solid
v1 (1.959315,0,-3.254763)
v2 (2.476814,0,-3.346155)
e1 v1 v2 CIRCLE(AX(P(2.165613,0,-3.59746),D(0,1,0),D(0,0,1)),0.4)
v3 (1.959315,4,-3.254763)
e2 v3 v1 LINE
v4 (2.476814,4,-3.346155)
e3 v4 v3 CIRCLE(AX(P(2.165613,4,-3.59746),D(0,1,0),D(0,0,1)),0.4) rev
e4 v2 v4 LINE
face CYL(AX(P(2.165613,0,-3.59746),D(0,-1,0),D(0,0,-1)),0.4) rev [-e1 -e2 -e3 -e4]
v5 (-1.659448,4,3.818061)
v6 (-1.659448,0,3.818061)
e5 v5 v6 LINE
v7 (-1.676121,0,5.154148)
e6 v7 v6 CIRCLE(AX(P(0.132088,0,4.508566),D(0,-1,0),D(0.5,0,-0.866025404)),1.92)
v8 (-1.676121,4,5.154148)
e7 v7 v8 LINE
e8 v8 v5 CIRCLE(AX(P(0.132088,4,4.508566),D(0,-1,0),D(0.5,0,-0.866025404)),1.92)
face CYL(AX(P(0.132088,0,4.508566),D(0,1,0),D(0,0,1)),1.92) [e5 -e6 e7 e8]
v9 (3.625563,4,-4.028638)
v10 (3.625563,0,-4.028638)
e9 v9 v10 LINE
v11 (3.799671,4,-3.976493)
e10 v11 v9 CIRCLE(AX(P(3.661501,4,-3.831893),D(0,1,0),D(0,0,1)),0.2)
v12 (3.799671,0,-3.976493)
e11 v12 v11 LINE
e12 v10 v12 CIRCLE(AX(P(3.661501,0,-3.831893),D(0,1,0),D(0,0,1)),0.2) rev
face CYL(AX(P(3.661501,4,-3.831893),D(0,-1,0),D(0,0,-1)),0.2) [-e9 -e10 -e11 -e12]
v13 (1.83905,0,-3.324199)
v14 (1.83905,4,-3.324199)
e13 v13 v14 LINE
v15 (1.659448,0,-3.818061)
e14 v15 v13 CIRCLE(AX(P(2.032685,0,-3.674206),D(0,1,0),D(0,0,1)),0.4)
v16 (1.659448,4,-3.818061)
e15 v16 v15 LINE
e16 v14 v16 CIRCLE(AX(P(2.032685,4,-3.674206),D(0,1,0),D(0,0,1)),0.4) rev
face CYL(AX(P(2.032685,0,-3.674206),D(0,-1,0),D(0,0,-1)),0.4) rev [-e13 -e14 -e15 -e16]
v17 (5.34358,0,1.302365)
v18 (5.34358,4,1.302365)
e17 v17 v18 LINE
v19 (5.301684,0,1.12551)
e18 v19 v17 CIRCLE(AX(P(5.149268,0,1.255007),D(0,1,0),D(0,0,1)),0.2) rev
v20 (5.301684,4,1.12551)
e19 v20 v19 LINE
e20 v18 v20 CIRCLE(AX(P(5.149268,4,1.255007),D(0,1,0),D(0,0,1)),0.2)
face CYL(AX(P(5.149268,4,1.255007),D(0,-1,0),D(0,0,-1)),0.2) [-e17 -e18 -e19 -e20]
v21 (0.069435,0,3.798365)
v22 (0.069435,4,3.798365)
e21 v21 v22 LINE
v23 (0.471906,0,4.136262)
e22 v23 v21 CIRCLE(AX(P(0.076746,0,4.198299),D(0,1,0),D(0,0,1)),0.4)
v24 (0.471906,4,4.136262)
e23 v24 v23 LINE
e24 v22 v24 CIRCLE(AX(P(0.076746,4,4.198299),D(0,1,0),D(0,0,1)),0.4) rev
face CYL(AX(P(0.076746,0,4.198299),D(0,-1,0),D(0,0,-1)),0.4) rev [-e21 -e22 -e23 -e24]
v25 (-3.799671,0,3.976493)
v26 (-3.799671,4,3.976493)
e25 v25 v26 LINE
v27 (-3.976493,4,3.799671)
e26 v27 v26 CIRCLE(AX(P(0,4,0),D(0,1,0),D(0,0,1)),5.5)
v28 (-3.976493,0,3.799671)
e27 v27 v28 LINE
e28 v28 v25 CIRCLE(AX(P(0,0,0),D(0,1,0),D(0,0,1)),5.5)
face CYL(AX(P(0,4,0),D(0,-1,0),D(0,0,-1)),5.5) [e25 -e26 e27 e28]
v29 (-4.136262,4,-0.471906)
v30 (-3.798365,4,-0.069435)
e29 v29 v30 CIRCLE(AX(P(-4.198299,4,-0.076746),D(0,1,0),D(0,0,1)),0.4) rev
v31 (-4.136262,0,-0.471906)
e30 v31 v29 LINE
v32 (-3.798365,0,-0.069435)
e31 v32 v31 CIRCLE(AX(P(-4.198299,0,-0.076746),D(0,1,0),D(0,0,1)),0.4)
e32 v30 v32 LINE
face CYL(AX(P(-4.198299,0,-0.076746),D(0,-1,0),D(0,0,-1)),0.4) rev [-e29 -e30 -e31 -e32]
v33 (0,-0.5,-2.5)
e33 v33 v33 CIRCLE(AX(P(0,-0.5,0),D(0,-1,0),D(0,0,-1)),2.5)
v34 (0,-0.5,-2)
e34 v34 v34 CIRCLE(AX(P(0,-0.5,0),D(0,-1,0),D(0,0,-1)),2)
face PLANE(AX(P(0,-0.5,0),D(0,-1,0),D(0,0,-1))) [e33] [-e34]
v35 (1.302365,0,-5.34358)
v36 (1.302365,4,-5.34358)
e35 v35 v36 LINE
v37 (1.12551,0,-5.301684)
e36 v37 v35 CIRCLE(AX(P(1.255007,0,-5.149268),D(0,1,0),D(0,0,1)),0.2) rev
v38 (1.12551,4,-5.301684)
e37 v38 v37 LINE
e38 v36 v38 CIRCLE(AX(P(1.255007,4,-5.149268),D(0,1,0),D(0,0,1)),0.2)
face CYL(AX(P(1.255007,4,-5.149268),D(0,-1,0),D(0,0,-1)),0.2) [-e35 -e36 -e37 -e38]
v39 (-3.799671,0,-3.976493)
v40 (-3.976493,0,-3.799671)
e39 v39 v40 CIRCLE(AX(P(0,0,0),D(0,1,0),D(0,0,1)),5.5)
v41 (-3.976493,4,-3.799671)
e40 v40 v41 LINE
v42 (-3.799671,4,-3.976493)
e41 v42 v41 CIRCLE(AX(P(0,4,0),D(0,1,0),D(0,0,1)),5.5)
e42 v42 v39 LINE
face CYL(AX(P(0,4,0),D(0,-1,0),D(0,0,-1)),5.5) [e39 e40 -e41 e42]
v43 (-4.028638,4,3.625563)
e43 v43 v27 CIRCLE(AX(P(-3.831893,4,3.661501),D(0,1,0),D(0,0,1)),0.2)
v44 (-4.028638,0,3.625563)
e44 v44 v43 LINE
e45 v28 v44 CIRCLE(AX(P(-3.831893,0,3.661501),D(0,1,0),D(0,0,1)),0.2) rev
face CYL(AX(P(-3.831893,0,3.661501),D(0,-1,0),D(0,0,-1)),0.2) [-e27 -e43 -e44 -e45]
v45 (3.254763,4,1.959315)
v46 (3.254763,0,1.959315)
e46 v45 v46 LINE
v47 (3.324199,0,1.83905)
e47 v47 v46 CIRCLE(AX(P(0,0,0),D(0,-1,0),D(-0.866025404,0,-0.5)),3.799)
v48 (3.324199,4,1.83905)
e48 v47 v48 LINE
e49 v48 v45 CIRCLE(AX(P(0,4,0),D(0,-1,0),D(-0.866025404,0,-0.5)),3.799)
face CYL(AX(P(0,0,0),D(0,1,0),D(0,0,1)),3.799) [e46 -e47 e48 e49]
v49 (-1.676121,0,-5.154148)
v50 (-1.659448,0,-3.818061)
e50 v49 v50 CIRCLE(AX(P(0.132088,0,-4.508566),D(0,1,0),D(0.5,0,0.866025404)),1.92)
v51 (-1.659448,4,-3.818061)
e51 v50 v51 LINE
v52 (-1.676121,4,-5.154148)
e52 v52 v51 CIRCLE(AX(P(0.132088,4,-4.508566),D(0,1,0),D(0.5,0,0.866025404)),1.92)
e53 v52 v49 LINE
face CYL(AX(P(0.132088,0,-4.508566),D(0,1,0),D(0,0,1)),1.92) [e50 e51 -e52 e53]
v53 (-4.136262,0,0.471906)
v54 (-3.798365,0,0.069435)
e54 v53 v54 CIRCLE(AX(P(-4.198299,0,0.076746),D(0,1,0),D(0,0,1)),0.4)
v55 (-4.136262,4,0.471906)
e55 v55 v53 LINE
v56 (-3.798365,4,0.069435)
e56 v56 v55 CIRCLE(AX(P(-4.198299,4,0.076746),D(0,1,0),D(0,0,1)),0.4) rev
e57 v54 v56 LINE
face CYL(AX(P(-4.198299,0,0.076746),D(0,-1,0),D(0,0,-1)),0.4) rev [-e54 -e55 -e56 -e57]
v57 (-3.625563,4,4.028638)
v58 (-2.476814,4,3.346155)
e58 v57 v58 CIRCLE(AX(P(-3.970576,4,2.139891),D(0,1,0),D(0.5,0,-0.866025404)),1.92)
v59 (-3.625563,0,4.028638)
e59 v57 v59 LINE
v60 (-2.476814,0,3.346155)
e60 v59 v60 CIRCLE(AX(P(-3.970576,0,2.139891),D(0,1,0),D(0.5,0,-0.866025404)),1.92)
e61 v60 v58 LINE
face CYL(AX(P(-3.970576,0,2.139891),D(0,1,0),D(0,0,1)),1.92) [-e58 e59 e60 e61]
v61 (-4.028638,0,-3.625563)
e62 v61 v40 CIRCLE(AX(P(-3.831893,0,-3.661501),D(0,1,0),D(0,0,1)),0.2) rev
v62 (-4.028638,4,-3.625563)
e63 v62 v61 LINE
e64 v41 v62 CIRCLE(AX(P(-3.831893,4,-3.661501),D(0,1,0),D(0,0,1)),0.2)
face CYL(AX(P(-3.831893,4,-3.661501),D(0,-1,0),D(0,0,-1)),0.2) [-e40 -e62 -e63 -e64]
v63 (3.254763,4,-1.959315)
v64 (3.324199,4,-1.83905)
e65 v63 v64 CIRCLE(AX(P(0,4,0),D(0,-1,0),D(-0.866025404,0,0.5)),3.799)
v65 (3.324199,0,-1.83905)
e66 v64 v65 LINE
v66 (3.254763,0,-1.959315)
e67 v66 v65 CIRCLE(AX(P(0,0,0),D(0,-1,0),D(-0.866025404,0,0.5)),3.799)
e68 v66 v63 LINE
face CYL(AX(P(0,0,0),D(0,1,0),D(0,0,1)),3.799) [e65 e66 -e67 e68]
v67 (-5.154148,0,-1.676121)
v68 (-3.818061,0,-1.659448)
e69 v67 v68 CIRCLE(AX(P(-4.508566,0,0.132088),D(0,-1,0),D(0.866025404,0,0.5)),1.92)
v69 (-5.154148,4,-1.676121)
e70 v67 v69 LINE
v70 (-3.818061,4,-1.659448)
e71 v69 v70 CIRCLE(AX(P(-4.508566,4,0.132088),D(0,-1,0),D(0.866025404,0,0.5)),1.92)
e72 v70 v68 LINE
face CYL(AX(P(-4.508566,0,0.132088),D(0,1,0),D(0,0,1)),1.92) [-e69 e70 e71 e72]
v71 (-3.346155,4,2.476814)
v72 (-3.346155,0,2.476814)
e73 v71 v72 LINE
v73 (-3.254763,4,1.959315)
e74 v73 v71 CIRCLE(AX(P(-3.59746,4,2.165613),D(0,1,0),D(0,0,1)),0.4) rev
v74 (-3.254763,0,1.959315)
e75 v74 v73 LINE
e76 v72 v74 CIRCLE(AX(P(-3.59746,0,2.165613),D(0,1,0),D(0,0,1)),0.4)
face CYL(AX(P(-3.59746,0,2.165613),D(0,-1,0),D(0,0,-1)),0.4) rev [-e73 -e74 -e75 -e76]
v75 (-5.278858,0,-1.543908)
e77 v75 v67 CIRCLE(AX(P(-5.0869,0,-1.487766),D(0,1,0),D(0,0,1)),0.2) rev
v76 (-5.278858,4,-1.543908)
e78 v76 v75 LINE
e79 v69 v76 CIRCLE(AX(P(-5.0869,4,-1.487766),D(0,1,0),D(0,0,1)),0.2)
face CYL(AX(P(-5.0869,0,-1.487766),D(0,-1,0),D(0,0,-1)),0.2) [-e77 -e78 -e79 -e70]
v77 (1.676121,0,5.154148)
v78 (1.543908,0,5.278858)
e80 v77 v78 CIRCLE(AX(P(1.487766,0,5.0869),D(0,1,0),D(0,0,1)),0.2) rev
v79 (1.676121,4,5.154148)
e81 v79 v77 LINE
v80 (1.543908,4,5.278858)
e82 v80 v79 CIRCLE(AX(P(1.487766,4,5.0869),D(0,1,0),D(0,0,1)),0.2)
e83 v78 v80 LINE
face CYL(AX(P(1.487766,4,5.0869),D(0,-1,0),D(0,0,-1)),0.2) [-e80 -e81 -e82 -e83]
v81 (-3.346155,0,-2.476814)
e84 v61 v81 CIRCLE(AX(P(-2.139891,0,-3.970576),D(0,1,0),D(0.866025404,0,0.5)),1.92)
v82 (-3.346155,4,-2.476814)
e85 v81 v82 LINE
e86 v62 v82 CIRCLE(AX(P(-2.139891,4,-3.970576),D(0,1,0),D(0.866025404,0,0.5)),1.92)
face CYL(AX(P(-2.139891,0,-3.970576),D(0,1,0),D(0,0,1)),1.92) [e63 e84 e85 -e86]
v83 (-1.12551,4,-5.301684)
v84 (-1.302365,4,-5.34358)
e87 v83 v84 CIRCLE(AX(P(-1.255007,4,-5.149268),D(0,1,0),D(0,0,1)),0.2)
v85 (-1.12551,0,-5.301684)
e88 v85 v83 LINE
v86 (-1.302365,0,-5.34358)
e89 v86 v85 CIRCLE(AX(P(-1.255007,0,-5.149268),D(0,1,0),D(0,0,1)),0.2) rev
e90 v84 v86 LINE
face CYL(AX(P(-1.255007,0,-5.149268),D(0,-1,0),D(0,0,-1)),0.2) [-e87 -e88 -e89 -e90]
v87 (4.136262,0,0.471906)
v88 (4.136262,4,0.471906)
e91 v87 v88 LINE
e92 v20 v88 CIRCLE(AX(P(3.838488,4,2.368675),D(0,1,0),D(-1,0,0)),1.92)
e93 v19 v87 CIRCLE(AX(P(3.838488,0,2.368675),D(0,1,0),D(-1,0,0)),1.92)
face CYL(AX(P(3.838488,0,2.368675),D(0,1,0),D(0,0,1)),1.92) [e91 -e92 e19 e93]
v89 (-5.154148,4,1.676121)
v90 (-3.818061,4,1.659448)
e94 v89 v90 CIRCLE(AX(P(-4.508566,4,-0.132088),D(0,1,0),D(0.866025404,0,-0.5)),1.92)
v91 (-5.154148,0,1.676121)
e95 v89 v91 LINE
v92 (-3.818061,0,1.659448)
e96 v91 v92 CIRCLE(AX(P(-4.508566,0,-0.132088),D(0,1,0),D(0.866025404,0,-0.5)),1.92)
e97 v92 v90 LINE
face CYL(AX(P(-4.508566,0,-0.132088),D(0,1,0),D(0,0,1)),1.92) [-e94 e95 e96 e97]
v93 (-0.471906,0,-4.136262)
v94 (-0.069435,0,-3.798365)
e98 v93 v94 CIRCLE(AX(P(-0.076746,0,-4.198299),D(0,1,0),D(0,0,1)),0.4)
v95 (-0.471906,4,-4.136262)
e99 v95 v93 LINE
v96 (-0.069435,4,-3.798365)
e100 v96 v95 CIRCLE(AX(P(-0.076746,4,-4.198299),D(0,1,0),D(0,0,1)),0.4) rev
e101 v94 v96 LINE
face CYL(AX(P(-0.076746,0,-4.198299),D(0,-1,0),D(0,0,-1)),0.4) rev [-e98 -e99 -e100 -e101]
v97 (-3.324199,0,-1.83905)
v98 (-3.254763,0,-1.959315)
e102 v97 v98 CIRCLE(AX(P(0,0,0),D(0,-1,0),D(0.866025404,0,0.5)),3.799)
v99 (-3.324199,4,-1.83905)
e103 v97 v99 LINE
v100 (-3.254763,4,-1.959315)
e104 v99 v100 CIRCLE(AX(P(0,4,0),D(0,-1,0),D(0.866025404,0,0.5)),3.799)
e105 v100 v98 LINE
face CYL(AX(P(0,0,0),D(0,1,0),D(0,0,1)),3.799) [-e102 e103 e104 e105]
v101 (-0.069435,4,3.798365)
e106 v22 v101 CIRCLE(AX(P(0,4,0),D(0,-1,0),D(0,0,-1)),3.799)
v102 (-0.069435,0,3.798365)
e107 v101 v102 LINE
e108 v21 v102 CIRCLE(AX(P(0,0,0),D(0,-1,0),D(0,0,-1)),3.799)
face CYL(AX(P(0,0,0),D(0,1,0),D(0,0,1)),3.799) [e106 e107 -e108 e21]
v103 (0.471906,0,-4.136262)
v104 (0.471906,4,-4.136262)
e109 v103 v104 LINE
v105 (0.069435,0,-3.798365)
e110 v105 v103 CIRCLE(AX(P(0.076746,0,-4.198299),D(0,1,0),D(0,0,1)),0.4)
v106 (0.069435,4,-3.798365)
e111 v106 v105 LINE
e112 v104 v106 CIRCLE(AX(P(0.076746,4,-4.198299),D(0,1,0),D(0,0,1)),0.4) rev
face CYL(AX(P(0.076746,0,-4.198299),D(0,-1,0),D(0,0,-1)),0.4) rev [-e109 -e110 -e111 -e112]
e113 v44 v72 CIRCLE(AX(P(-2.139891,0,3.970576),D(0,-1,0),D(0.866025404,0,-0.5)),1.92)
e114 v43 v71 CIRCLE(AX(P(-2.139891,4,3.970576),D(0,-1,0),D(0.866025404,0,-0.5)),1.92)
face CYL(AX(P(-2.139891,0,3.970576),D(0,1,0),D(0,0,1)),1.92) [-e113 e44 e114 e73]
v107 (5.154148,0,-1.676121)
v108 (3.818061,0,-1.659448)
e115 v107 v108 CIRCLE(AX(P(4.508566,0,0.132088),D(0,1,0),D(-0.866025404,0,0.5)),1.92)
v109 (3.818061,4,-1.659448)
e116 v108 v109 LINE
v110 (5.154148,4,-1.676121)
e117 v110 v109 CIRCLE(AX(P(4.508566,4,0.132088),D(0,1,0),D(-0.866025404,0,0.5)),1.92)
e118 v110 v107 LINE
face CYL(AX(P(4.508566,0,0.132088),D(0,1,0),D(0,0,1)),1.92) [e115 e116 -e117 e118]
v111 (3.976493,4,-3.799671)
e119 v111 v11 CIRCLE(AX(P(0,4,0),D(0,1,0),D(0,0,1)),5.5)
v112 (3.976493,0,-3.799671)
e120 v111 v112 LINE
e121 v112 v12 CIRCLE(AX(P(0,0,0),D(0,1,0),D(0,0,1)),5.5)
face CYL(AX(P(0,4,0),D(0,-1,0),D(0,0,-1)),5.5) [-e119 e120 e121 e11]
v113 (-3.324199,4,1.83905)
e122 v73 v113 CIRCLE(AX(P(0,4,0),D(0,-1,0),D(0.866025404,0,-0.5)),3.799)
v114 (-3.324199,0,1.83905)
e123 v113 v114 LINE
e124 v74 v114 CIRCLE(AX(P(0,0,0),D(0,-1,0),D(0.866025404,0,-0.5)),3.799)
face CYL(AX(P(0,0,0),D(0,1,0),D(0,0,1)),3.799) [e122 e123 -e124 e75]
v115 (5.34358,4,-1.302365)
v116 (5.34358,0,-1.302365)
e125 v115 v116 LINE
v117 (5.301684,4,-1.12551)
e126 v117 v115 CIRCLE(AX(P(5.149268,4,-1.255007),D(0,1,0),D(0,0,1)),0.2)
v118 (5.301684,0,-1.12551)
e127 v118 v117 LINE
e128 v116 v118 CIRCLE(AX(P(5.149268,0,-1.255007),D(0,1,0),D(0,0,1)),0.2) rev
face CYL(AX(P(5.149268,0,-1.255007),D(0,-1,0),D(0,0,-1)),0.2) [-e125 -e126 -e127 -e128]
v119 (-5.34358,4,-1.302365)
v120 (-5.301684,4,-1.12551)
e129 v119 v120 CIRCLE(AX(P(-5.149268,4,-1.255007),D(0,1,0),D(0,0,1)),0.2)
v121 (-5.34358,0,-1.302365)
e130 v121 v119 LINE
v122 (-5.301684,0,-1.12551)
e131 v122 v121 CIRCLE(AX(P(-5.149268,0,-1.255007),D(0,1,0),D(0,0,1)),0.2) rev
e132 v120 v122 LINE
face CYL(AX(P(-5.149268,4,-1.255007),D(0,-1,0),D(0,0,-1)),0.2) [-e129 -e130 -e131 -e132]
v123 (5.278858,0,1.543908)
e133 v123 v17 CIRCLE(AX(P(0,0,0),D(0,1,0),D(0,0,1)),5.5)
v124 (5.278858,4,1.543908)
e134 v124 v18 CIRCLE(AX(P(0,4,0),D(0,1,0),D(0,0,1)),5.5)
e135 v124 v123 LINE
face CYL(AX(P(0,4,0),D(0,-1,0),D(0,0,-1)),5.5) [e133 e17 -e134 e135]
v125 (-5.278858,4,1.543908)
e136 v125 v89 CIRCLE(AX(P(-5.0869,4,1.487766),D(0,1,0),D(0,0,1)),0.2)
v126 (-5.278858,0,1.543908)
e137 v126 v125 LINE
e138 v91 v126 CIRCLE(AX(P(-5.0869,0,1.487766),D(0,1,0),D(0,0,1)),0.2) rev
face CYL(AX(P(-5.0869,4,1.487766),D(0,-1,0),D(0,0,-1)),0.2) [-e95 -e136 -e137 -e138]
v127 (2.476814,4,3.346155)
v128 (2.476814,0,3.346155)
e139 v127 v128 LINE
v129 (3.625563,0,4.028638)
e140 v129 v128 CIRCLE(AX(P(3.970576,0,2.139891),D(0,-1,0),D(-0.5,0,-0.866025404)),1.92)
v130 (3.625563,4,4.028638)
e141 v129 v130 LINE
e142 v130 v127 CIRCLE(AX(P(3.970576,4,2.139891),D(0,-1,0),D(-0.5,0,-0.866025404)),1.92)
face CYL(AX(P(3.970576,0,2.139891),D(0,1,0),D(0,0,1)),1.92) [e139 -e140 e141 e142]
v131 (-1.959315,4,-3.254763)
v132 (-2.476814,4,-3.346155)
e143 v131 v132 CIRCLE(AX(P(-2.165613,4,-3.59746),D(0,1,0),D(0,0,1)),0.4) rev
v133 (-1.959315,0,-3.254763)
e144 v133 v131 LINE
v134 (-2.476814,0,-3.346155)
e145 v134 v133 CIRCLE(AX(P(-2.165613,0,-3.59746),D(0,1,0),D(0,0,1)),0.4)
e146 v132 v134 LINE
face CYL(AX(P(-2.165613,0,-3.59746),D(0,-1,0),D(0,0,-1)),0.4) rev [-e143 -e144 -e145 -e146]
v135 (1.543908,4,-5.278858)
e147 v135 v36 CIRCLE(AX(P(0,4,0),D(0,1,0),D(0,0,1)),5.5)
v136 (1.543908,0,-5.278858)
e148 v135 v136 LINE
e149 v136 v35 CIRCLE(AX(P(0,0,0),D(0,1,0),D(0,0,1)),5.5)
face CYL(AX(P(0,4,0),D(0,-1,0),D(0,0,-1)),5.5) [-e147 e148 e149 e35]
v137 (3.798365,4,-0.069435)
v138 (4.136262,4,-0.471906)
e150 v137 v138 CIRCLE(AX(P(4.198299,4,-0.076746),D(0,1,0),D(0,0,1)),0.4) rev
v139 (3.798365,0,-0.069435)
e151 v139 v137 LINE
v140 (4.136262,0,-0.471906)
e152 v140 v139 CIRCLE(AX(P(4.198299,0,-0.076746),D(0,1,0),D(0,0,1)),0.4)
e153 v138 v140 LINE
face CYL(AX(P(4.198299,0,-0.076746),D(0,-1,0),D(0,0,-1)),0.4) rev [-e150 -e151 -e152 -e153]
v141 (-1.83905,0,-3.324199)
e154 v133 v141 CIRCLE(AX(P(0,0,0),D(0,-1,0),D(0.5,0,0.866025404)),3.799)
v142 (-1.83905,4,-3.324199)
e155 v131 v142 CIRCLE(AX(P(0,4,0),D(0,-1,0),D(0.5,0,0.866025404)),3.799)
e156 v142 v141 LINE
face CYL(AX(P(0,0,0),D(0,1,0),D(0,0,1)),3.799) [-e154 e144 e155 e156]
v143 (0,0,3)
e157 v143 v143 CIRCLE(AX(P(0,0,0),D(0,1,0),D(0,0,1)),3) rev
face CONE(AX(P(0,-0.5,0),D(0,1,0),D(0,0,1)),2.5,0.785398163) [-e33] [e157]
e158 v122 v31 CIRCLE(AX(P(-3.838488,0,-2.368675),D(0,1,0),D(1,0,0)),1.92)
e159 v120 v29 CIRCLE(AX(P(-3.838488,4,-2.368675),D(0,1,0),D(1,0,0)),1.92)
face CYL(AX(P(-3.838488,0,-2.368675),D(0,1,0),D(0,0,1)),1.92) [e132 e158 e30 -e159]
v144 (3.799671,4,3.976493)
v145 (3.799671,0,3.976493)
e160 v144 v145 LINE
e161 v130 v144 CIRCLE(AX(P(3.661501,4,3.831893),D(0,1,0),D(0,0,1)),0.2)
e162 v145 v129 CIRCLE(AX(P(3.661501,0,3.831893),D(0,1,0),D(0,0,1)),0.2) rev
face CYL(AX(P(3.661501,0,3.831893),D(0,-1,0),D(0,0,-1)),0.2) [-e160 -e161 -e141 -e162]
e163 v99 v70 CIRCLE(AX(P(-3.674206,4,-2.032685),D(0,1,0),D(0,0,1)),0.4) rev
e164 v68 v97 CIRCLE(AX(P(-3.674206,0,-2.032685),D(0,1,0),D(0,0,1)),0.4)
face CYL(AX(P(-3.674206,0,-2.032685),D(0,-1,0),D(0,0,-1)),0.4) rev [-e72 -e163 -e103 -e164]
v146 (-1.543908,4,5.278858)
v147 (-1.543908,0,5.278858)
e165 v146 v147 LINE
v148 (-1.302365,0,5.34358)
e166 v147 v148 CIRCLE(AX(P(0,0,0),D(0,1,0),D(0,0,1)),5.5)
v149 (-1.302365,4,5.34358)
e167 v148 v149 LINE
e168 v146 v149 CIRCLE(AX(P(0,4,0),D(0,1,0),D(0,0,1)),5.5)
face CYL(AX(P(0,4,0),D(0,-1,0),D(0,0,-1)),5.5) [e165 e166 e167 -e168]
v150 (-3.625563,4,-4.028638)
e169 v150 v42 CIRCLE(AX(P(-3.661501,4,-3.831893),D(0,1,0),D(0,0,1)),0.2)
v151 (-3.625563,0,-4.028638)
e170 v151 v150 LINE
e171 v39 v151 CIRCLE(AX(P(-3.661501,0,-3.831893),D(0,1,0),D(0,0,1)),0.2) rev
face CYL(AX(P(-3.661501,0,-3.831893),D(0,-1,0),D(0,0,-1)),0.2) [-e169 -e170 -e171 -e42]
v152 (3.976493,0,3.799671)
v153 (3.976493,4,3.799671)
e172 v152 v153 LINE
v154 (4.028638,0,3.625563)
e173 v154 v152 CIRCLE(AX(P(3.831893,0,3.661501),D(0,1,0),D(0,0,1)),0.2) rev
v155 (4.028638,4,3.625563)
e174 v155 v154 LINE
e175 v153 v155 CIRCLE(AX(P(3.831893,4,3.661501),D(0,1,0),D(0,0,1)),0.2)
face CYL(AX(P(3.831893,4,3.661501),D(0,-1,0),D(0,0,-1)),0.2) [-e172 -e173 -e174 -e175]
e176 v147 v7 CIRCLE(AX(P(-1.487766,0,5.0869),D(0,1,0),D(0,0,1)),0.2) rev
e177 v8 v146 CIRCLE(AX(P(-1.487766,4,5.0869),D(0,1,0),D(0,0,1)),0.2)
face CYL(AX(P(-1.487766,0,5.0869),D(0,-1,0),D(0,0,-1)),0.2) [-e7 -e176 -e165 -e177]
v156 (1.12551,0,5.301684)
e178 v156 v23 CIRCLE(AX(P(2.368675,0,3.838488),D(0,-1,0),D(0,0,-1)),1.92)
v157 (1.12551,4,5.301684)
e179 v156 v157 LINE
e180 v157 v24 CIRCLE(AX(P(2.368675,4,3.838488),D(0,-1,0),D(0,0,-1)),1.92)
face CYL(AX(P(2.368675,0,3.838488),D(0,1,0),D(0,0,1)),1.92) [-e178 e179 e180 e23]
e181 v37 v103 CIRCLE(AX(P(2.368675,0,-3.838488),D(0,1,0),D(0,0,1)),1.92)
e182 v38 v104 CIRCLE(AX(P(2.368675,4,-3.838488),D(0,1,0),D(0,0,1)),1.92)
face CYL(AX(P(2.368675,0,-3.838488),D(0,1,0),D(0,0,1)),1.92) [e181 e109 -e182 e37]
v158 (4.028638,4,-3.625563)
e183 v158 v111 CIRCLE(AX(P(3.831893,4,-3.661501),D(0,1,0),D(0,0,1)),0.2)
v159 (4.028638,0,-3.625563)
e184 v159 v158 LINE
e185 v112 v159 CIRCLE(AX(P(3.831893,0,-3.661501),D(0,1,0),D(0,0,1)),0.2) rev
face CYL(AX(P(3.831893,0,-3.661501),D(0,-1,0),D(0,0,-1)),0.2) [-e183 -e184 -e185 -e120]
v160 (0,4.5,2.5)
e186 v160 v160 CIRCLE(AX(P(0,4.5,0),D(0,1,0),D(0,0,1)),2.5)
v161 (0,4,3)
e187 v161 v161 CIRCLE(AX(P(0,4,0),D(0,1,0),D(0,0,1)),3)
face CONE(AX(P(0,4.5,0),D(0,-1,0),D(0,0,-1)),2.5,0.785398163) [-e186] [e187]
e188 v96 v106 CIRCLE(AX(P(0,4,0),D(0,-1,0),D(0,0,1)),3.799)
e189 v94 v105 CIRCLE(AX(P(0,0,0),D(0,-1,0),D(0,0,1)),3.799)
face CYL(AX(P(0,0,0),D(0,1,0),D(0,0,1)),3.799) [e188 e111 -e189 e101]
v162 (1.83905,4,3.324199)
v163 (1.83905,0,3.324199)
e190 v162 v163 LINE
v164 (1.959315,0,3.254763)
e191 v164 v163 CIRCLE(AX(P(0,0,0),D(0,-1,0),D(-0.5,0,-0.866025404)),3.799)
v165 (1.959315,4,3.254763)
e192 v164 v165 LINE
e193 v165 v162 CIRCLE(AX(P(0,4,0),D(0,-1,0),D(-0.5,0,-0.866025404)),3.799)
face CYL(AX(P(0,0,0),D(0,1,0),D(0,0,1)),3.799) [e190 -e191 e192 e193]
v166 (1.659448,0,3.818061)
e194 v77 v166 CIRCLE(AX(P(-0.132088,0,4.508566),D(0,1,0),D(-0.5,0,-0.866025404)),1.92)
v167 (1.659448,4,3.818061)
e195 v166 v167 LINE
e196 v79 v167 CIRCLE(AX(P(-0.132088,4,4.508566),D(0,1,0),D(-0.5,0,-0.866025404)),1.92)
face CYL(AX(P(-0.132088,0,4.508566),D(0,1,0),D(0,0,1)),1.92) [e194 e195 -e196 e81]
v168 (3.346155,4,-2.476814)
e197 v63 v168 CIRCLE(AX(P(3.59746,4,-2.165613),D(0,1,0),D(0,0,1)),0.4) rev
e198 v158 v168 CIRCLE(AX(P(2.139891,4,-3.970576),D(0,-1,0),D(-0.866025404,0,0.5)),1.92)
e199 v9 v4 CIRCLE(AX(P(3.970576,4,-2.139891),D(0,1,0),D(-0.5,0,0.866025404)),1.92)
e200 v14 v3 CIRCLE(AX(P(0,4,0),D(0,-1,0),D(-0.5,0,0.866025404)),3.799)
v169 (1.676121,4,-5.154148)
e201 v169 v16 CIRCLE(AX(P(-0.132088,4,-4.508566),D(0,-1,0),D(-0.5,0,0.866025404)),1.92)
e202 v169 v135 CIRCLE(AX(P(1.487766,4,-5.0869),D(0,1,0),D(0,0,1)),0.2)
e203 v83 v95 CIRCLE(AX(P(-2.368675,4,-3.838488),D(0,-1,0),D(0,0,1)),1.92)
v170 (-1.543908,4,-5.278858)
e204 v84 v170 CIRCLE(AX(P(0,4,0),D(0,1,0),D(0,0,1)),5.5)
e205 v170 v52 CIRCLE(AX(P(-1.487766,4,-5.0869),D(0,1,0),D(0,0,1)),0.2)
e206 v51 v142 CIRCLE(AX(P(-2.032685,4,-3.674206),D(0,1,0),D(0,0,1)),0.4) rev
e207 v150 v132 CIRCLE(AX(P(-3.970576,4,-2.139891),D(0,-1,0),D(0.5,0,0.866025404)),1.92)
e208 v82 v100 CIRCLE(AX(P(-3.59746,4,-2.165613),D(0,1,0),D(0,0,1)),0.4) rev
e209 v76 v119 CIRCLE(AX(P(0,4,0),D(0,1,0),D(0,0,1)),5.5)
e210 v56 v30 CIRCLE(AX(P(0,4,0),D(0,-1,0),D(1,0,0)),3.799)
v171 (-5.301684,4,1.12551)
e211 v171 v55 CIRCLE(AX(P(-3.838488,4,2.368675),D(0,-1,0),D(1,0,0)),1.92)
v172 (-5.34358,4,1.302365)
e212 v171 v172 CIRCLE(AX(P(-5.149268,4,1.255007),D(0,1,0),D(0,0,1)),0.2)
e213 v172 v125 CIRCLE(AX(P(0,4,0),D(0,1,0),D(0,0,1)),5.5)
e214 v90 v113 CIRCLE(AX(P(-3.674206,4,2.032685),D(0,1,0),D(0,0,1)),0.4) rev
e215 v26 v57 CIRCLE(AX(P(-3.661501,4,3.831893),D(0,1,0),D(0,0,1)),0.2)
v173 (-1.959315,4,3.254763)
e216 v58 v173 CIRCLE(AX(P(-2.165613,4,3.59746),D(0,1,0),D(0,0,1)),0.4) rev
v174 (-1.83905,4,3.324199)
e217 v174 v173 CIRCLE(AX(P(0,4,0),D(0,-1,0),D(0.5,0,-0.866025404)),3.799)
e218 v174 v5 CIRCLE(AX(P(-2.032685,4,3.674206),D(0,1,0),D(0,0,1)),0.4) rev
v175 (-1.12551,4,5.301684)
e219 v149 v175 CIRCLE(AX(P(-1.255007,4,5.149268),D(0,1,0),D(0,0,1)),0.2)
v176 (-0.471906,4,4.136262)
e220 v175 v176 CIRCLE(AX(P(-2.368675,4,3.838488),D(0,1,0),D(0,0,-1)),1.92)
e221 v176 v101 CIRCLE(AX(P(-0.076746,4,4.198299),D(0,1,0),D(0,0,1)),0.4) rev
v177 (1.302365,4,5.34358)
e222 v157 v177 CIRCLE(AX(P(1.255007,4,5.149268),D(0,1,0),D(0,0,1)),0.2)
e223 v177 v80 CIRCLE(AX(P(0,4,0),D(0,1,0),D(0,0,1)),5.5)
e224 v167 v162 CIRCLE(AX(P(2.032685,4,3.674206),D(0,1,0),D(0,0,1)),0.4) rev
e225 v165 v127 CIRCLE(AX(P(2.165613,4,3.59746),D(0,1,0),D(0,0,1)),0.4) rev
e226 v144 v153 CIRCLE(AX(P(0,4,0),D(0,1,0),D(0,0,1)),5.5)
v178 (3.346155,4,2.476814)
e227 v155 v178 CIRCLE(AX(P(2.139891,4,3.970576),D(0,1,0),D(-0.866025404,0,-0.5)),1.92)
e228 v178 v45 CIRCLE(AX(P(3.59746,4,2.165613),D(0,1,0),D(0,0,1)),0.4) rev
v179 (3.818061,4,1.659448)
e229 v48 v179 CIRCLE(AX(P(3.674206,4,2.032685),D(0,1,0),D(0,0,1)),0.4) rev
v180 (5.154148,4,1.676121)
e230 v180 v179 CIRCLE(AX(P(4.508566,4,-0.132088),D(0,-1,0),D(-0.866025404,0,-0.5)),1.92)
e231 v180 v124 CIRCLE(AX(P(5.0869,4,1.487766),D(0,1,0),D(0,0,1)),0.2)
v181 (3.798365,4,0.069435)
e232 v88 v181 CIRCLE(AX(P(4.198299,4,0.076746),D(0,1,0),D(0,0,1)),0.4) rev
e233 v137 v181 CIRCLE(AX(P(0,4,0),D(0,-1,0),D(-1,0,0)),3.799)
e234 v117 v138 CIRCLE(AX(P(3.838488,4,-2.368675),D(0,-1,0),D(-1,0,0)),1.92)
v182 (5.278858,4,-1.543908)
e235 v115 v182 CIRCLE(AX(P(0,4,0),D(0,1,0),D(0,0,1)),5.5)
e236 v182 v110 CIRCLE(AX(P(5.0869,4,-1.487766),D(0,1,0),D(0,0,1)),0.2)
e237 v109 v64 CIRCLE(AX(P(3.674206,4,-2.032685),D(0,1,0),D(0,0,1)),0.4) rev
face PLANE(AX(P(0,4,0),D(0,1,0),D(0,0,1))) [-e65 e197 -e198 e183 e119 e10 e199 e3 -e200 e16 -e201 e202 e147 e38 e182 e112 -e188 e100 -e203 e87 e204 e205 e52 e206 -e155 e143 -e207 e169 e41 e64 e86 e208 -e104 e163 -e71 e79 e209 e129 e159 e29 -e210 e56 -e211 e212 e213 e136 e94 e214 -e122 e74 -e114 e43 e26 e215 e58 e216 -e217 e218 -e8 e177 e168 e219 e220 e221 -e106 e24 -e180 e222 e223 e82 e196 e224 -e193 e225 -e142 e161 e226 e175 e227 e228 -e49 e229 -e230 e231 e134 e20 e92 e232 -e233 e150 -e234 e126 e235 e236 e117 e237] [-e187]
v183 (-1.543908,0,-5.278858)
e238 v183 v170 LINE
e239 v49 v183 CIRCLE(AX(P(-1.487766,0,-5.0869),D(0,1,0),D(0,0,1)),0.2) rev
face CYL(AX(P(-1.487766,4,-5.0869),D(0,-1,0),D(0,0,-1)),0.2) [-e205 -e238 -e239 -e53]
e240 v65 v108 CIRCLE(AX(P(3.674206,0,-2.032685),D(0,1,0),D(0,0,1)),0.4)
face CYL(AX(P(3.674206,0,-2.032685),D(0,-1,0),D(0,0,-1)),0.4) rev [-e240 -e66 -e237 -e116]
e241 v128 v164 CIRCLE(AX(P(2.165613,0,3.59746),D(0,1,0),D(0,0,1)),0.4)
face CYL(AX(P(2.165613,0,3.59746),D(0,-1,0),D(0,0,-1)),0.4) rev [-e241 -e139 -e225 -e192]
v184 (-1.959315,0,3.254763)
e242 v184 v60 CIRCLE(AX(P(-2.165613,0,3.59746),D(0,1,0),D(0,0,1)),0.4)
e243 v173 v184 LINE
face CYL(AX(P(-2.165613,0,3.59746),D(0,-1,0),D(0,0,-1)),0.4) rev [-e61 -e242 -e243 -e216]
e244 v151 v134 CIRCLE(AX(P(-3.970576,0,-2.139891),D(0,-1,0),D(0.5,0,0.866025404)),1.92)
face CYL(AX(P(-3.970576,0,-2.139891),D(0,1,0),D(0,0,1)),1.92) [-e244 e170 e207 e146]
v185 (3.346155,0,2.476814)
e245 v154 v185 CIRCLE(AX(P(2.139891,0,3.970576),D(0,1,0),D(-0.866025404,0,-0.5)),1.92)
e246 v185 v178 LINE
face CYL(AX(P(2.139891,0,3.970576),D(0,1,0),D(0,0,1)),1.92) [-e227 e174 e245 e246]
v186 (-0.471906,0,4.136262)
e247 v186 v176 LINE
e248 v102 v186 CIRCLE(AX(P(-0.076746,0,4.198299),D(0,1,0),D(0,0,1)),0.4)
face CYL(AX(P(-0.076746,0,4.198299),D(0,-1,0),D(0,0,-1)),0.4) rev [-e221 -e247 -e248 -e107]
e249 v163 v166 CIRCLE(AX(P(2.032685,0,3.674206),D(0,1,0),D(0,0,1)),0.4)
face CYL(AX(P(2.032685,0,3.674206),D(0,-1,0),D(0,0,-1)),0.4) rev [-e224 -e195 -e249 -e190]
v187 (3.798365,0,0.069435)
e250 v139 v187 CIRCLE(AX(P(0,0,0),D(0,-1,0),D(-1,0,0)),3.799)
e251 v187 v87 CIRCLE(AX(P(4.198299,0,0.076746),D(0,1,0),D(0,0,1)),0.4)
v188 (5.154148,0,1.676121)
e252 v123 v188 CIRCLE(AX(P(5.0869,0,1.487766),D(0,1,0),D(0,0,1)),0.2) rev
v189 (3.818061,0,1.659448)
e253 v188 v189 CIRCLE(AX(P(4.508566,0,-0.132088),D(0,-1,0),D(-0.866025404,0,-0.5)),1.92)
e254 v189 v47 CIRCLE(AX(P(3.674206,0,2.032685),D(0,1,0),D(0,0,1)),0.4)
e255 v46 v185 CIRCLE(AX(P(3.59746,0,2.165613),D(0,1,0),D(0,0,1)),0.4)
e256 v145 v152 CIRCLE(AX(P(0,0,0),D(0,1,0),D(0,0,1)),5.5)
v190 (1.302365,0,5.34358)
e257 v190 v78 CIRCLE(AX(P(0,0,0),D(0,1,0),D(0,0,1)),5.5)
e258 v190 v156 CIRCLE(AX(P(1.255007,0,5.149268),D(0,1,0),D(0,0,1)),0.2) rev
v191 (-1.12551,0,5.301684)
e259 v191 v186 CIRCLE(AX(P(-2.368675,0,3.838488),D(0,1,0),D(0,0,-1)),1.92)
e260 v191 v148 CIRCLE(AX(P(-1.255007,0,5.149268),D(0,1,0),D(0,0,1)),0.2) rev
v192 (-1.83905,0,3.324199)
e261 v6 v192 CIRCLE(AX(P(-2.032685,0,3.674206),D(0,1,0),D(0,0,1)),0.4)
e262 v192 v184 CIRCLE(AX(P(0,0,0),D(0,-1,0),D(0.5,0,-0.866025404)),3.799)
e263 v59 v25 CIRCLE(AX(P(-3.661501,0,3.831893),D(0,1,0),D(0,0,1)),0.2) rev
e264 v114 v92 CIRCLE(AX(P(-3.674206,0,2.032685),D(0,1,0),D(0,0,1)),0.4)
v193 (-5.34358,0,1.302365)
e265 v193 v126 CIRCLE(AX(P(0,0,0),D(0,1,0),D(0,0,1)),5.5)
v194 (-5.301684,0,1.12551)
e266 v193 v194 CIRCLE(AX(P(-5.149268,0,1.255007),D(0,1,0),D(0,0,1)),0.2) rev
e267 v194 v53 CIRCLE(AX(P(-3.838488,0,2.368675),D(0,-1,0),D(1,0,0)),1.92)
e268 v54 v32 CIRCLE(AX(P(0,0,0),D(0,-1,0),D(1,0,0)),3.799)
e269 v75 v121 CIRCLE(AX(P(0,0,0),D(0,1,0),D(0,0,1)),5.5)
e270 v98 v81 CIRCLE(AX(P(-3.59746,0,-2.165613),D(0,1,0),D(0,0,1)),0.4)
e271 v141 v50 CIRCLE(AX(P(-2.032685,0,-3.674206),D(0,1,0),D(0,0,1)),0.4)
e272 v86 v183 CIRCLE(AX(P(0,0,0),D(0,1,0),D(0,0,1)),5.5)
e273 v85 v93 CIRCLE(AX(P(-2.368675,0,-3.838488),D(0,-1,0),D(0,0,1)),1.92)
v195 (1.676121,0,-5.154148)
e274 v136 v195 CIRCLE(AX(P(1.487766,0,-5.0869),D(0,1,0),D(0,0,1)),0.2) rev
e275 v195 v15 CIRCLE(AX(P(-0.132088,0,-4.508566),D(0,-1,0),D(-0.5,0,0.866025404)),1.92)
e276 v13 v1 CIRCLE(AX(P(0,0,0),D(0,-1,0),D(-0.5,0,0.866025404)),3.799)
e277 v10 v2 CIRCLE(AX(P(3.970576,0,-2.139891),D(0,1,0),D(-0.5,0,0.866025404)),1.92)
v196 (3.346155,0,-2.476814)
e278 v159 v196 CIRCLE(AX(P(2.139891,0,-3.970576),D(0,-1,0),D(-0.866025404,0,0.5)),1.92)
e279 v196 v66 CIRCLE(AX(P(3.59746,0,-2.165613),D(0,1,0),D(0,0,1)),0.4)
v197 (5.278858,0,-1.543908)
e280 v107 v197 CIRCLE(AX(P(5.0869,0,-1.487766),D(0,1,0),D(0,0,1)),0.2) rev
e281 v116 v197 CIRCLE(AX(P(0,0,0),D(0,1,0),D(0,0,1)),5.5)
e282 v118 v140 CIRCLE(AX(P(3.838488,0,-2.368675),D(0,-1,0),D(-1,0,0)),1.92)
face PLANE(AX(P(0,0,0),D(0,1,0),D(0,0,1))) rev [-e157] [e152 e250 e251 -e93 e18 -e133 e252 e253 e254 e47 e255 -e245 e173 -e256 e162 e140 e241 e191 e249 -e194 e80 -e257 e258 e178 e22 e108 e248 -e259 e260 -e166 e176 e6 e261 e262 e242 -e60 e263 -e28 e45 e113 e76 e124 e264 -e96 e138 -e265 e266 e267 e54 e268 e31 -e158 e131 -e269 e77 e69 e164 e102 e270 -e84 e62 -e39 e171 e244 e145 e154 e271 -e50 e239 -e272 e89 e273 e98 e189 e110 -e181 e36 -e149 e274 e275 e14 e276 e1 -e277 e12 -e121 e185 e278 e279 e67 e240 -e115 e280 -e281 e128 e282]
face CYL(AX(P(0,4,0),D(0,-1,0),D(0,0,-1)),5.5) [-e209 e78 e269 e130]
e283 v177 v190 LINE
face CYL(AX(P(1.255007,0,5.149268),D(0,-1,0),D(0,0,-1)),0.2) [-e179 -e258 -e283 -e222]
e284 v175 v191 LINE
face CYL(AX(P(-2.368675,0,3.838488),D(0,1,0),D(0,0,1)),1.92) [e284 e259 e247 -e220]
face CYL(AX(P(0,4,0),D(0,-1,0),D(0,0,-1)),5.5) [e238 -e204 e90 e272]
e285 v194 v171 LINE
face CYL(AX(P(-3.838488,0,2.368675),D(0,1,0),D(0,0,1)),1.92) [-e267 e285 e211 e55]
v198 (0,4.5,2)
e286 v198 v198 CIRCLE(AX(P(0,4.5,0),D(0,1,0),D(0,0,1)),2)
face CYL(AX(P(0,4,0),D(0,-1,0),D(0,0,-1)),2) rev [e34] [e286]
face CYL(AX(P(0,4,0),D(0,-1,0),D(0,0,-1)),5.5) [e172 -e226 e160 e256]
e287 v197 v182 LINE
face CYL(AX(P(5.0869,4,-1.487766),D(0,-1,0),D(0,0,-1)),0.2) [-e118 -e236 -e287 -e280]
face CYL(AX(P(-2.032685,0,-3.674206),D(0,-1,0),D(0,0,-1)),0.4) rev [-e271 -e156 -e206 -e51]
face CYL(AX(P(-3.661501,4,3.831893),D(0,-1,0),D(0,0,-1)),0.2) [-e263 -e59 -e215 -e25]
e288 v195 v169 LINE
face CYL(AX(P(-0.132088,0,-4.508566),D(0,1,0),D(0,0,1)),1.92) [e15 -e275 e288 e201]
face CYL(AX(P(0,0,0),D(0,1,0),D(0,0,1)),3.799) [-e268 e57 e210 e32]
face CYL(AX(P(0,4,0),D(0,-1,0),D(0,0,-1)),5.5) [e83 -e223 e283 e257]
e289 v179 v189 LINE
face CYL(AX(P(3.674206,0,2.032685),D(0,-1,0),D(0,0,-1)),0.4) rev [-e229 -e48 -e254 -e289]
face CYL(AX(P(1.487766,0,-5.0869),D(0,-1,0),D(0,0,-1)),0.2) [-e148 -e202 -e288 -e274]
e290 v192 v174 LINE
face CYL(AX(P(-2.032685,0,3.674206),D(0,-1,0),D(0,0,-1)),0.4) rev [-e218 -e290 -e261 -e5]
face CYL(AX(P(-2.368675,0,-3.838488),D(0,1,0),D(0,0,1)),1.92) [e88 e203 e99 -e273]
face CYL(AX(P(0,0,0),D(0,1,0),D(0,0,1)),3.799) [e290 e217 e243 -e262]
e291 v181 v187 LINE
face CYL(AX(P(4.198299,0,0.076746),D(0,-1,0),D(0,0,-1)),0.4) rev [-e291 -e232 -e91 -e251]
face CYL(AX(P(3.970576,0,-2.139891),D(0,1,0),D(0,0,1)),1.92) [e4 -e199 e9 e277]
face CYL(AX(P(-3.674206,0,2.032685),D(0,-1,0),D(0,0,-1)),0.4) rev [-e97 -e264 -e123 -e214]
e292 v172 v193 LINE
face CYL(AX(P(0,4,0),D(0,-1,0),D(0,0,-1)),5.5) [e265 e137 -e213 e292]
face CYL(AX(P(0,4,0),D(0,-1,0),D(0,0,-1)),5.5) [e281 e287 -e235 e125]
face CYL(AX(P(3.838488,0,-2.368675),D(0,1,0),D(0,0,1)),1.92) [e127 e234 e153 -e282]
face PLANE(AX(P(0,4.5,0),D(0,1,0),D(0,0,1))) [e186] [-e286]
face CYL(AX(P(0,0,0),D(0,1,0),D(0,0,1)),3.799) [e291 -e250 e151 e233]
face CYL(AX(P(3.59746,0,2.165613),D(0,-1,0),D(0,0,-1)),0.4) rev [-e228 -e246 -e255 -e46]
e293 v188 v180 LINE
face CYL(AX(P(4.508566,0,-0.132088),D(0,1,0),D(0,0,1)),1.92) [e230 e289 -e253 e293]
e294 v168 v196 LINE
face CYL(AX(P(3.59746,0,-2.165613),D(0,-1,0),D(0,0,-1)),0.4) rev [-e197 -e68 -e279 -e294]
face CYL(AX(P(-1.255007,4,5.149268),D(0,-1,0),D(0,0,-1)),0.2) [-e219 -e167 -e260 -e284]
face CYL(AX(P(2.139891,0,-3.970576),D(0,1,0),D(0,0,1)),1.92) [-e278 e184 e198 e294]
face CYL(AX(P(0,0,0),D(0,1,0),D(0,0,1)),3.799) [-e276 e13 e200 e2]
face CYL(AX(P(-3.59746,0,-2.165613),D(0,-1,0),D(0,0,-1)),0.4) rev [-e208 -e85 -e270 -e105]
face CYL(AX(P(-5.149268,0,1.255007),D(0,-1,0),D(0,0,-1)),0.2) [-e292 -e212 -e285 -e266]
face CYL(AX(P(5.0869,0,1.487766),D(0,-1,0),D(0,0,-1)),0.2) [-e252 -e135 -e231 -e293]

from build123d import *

# Parameters (mm, degrees)
SKETCH1_R            = 5.5
SKETCH1_R_2          = 2
BOSS_EXTRUDE1_DEPTH  = 4
CUT_EXTRUDE1_DEPTH   = 4
FILLET1_R            = 0.2
FILLET2_R            = 0.4
FILLET1_OF_MIRROR1_R = 0.2
FILLET2_OF_MIRROR1_R = 0.4
CIRPATTERN1_DEPTH    = 4
SKETCH3_R            = 3
SKETCH3_R_2          = 2
BOSS_EXTRUDE2_DEPTH  = 0.5
CHAMFER1_SIZE        = 0.5
BOSS_EXTRUDE3_START  = 0.5
SKETCH4_R            = 3
SKETCH4_R_2          = 2
BOSS_EXTRUDE3_DEPTH  = 0.5
CHAMFER2_SIZE        = 0.5


# Read off the part's stored shape, not the designer's step: CirPattern1
with BuildPart() as part:
    # Sketch1 → Boss-Extrude1 (new body)
    with BuildSketch(Plane(origin=(0, 0, 0), x_dir=(1, 0, 0), z_dir=(0, 1, 0))):
        with Locations(Location((0, 0, 0), (0, 0, 270))):
            Circle(SKETCH1_R)
        with Locations(Location((0, 0, 0), (0, 0, 270))):
            Circle(SKETCH1_R_2, mode=Mode.SUBTRACT)
    extrude(amount=BOSS_EXTRUDE1_DEPTH)

    # Sketch2 → Cut-Extrude1 (cut)
    with BuildSketch(Plane(origin=(0, 4, 0), x_dir=(1, 0, 0), z_dir=(0, 1, 0))):
        with BuildLine():
            Line((0, 3.799), (0, 7.477315916))
            Line((0, 7.477315916), (-1.717756705, 5.644784223))
            ThreePointArc((-1.717756705, 5.644784223), (-0.778860554, 4.915006115), (-0.449816676, 3.772275965))
            ThreePointArc((-0.449816676, 3.772275965), (-0.225304913, 3.792313106), (0, 3.799))
        make_face()
    cut_extrude1 = extrude(amount=-CUT_EXTRUDE1_DEPTH, mode=Mode.SUBTRACT)

    # Fillet1
    fillet1_edges = [part.edges().sort_by_distance(p)[0] for p in [
        (-1.205722077, 2, -5.366212284),
    ]]
    fillet(fillet1_edges, radius=FILLET1_R)

    # Fillet2
    fillet2_edges = [part.edges().sort_by_distance(p)[0] for p in [
        (-0.449816676, 2, -3.772275965),
    ]]
    fillet(fillet2_edges, radius=FILLET2_R)

    # Mirror1: Cut-Extrude1 across plane
    add(cut_extrude1.mirror(Plane.ZY), mode=Mode.SUBTRACT)

    # Fillet1 of Mirror1
    fillet1_of_mirror1_edges = [part.edges().sort_by_distance(p)[0] for p in [
        (1.205722077, 2, -5.366212284),
    ]]
    fillet(fillet1_of_mirror1_edges, radius=FILLET1_OF_MIRROR1_R)

    # Fillet2 of Mirror1
    fillet2_of_mirror1_edges = [part.edges().sort_by_distance(p)[0] for p in [
        (0.449816676, 2, -3.772275965),
    ]]
    fillet(fillet2_of_mirror1_edges, radius=FILLET2_OF_MIRROR1_R)

    # CirPattern1 outline → CirPattern1 (cut)
    with BuildSketch(Plane(origin=(0, 0, 0), x_dir=(1, 0, 0), z_dir=(0, 1, 0))):
        with BuildLine():
            ThreePointArc((3.62556251, 4.028637884), (3.71888228, 4.023485264), (3.799671329, 3.976493152))
            ThreePointArc((3.799671329, 3.976493152), (2.75, 4.76313972), (1.543908423, 5.278858473))
            ThreePointArc((1.543908423, 5.278858473), (1.62499931, 5.23238916), (1.676121495, 5.154148179))
            ThreePointArc((1.676121495, 5.154148179), (1.787762124, 4.48460755), (1.659448371, 3.81806133))
            ThreePointArc((1.659448371, 3.81806133), (1.656771541, 3.537498856), (1.839050027, 3.32419855))
            ThreePointArc((1.839050027, 3.32419855), (1.8995, 3.290030509), (1.959315378, 3.254763317))
            ThreePointArc((1.959315378, 3.254763317), (2.235178105, 3.203555671), (2.47681392, 3.34615511))
            ThreePointArc((2.47681392, 3.34615511), (2.989903003, 3.79055119), (3.62556251, 4.028637884))
        make_face()
        with BuildLine():
            ThreePointArc((5.154148179, 1.676121495), (5.23238916, 1.62499931), (5.278858473, 1.543908423))
            ThreePointArc((5.278858473, 1.543908423), (4.763139721, 2.75), (3.976493152, 3.799671329))
            ThreePointArc((3.976493152, 3.799671329), (4.023485264, 3.71888228), (4.028637884, 3.62556251))
            ThreePointArc((4.028637884, 3.62556251), (3.79055119, 2.989903003), (3.34615511, 2.47681392))
            ThreePointArc((3.34615511, 2.47681392), (3.203555671, 2.235178105), (3.254763317, 1.959315378))
            ThreePointArc((3.254763317, 1.959315378), (3.290030509, 1.8995), (3.32419855, 1.839050027))
            ThreePointArc((3.32419855, 1.839050027), (3.537498856, 1.656771541), (3.81806133, 1.659448371))
            ThreePointArc((3.81806133, 1.659448371), (4.48460755, 1.787762124), (5.154148179, 1.676121495))
        make_face()
        with BuildLine():
            ThreePointArc((5.301684005, -1.125510295), (5.34388159, -1.208903897), (5.343579752, -1.302365321))
            ThreePointArc((5.343579752, -1.302365321), (5.5, 0), (5.343579752, 1.302365321))
            ThreePointArc((5.343579752, 1.302365321), (5.34388159, 1.208903897), (5.301684005, 1.125510295))
            ThreePointArc((5.301684005, 1.125510295), (4.777665126, 0.69405636), (4.13626229, 0.47190622))
            ThreePointArc((4.13626229, 0.47190622), (3.891949646, 0.333943185), (3.798365405, 0.069435233))
            ThreePointArc((3.798365405, 0.069435233), (3.799, 0), (3.798365405, -0.069435233))
            ThreePointArc((3.798365405, -0.069435233), (3.891949646, -0.333943185), (4.13626229, -0.47190622))
            ThreePointArc((4.13626229, -0.47190622), (4.777665126, -0.69405636), (5.301684005, -1.125510295))
        make_face()
        with BuildLine():
            ThreePointArc((4.028637884, -3.62556251), (4.023485264, -3.71888228), (3.976493152, -3.799671329))
            ThreePointArc((3.976493152, -3.799671329), (4.763139721, -2.75), (5.278858473, -1.543908423))
            ThreePointArc((5.278858473, -1.543908423), (5.23238916, -1.62499931), (5.154148179, -1.676121495))
            ThreePointArc((5.154148179, -1.676121495), (4.48460755, -1.787762124), (3.81806133, -1.659448371))
            ThreePointArc((3.81806133, -1.659448371), (3.537498856, -1.656771541), (3.32419855, -1.839050027))
            ThreePointArc((3.32419855, -1.839050027), (3.290030509, -1.8995), (3.254763317, -1.959315378))
            ThreePointArc((3.254763317, -1.959315378), (3.203555671, -2.235178105), (3.34615511, -2.47681392))
            ThreePointArc((3.34615511, -2.47681392), (3.79055119, -2.989903003), (4.028637884, -3.62556251))
        make_face()
        with BuildLine():
            ThreePointArc((1.676121495, -5.154148179), (1.62499931, -5.23238916), (1.543908423, -5.278858473))
            ThreePointArc((1.543908423, -5.278858473), (2.75, -4.763139721), (3.799671329, -3.976493152))
            ThreePointArc((3.799671329, -3.976493152), (3.71888228, -4.023485264), (3.62556251, -4.028637884))
            ThreePointArc((3.62556251, -4.028637884), (2.989903003, -3.79055119), (2.47681392, -3.34615511))
            ThreePointArc((2.47681392, -3.34615511), (2.235178105, -3.203555671), (1.959315378, -3.254763317))
            ThreePointArc((1.959315378, -3.254763317), (1.8995, -3.290030509), (1.839050027, -3.32419855))
            ThreePointArc((1.839050027, -3.32419855), (1.656771541, -3.537498856), (1.659448371, -3.81806133))
            ThreePointArc((1.659448371, -3.81806133), (1.787762124, -4.48460755), (1.676121495, -5.154148179))
        make_face()
        with BuildLine():
            ThreePointArc((-1.125510295, -5.301684005), (-1.208903897, -5.34388159), (-1.302365321, -5.343579752))
            ThreePointArc((-1.302365321, -5.343579752), (0, -5.5), (1.302365321, -5.343579752))
            ThreePointArc((1.302365321, -5.343579752), (1.208903897, -5.34388159), (1.125510295, -5.301684005))
            ThreePointArc((1.125510295, -5.301684005), (0.69405636, -4.777665126), (0.47190622, -4.13626229))
            ThreePointArc((0.47190622, -4.13626229), (0.333943185, -3.891949646), (0.069435233, -3.798365405))
            ThreePointArc((0.069435233, -3.798365405), (0, -3.799), (-0.069435233, -3.798365405))
            ThreePointArc((-0.069435233, -3.798365405), (-0.333943185, -3.891949646), (-0.47190622, -4.13626229))
            ThreePointArc((-0.47190622, -4.13626229), (-0.69405636, -4.777665126), (-1.125510295, -5.301684005))
        make_face()
        with BuildLine():
            ThreePointArc((-3.62556251, -4.028637884), (-3.71888228, -4.023485264), (-3.799671329, -3.976493152))
            ThreePointArc((-3.799671329, -3.976493152), (-2.75, -4.763139721), (-1.543908423, -5.278858473))
            ThreePointArc((-1.543908423, -5.278858473), (-1.62499931, -5.23238916), (-1.676121495, -5.154148179))
            ThreePointArc((-1.676121495, -5.154148179), (-1.787762124, -4.48460755), (-1.659448371, -3.81806133))
            ThreePointArc((-1.659448371, -3.81806133), (-1.656771541, -3.537498856), (-1.839050027, -3.32419855))
            ThreePointArc((-1.839050027, -3.32419855), (-1.8995, -3.290030509), (-1.959315378, -3.254763317))
            ThreePointArc((-1.959315378, -3.254763317), (-2.235178105, -3.203555671), (-2.47681392, -3.34615511))
            ThreePointArc((-2.47681392, -3.34615511), (-2.989903003, -3.79055119), (-3.62556251, -4.028637884))
        make_face()
        with BuildLine():
            ThreePointArc((-5.154148179, -1.676121495), (-5.23238916, -1.62499931), (-5.278858473, -1.543908423))
            ThreePointArc((-5.278858473, -1.543908423), (-4.763139721, -2.75), (-3.976493152, -3.799671329))
            ThreePointArc((-3.976493152, -3.799671329), (-4.023485264, -3.71888228), (-4.028637884, -3.62556251))
            ThreePointArc((-4.028637884, -3.62556251), (-3.79055119, -2.989903003), (-3.34615511, -2.47681392))
            ThreePointArc((-3.34615511, -2.47681392), (-3.203555671, -2.235178105), (-3.254763317, -1.959315378))
            ThreePointArc((-3.254763317, -1.959315378), (-3.290030509, -1.8995), (-3.32419855, -1.839050027))
            ThreePointArc((-3.32419855, -1.839050027), (-3.537498856, -1.656771541), (-3.81806133, -1.659448371))
            ThreePointArc((-3.81806133, -1.659448371), (-4.48460755, -1.787762124), (-5.154148179, -1.676121495))
        make_face()
        with BuildLine():
            ThreePointArc((-5.301684005, 1.125510295), (-5.34388159, 1.208903897), (-5.343579752, 1.302365321))
            ThreePointArc((-5.343579752, 1.302365321), (-5.5, 0), (-5.343579752, -1.302365321))
            ThreePointArc((-5.343579752, -1.302365321), (-5.34388159, -1.208903897), (-5.301684005, -1.125510295))
            ThreePointArc((-5.301684005, -1.125510295), (-4.777665126, -0.69405636), (-4.13626229, -0.47190622))
            ThreePointArc((-4.13626229, -0.47190622), (-3.891949646, -0.333943185), (-3.798365405, -0.069435233))
            ThreePointArc((-3.798365405, -0.069435233), (-3.799, 0), (-3.798365405, 0.069435233))
            ThreePointArc((-3.798365405, 0.069435233), (-3.891949646, 0.333943185), (-4.13626229, 0.47190622))
            ThreePointArc((-4.13626229, 0.47190622), (-4.777665126, 0.69405636), (-5.301684005, 1.125510295))
        make_face()
        with BuildLine():
            ThreePointArc((-4.028637884, 3.62556251), (-4.023485264, 3.71888228), (-3.976493152, 3.799671329))
            ThreePointArc((-3.976493152, 3.799671329), (-4.763139721, 2.75), (-5.278858473, 1.543908423))
            ThreePointArc((-5.278858473, 1.543908423), (-5.23238916, 1.62499931), (-5.154148179, 1.676121495))
            ThreePointArc((-5.154148179, 1.676121495), (-4.48460755, 1.787762124), (-3.81806133, 1.659448371))
            ThreePointArc((-3.81806133, 1.659448371), (-3.537498856, 1.656771541), (-3.32419855, 1.839050027))
            ThreePointArc((-3.32419855, 1.839050027), (-3.290030509, 1.8995), (-3.254763317, 1.959315378))
            ThreePointArc((-3.254763317, 1.959315378), (-3.203555671, 2.235178105), (-3.34615511, 2.47681392))
            ThreePointArc((-3.34615511, 2.47681392), (-3.79055119, 2.989903003), (-4.028637884, 3.62556251))
        make_face()
        with BuildLine():
            ThreePointArc((-1.959315378, 3.254763317), (-1.8995, 3.290030509), (-1.839050027, 3.32419855))
            ThreePointArc((-1.839050027, 3.32419855), (-1.656771541, 3.537498856), (-1.659448371, 3.81806133))
            ThreePointArc((-1.659448371, 3.81806133), (-1.787762124, 4.48460755), (-1.676121495, 5.154148179))
            ThreePointArc((-1.676121495, 5.154148179), (-1.62499931, 5.23238916), (-1.543908423, 5.278858473))
            ThreePointArc((-1.543908423, 5.278858473), (-2.75, 4.76313972), (-3.799671329, 3.976493152))
            ThreePointArc((-3.799671329, 3.976493152), (-3.71888228, 4.023485264), (-3.62556251, 4.028637884))
            ThreePointArc((-3.62556251, 4.028637884), (-2.989903003, 3.79055119), (-2.47681392, 3.34615511))
            ThreePointArc((-2.47681392, 3.34615511), (-2.235178105, 3.203555671), (-1.959315378, 3.254763317))
        make_face()
    extrude(amount=CIRPATTERN1_DEPTH, mode=Mode.SUBTRACT)

    # Sketch3 → Boss-Extrude2 (add)
    with BuildSketch(Plane(origin=(0, 4, 0), x_dir=(1, 0, 0), z_dir=(0, 1, 0))):
        with Locations(Location((0, 0, 0), (0, 0, 270))):
            Circle(SKETCH3_R)
        with Locations(Location((0, 0, 0), (0, 0, 270))):
            Circle(SKETCH3_R_2, mode=Mode.SUBTRACT)
    extrude(amount=BOSS_EXTRUDE2_DEPTH)

    # Chamfer1
    chamfer1_edges = [part.edges().sort_by_distance(p)[0] for p in [
        (0, 4.5, -3),
    ]]
    chamfer(chamfer1_edges, length=CHAMFER1_SIZE - 0.0001)  # a hair under: the kernel refuses the full size

    # Sketch4 → Boss-Extrude3 (add)
    with BuildSketch(Plane.XZ.offset(BOSS_EXTRUDE3_START)):
        with Locations(Location((0, 0, 0), (0, 0, 90))):
            Circle(SKETCH4_R)
        with Locations(Location((0, 0, 0), (0, 0, 270))):
            Circle(SKETCH4_R_2, mode=Mode.SUBTRACT)
    extrude(amount=-BOSS_EXTRUDE3_DEPTH)

    # Chamfer2
    chamfer2_edges = [part.edges().sort_by_distance(p)[0] for p in [
        (0, -0.5, -3),
    ]]
    chamfer(chamfer2_edges, length=CHAMFER2_SIZE - 0.0001)  # a hair under: the kernel refuses the full size


solid = part.part
